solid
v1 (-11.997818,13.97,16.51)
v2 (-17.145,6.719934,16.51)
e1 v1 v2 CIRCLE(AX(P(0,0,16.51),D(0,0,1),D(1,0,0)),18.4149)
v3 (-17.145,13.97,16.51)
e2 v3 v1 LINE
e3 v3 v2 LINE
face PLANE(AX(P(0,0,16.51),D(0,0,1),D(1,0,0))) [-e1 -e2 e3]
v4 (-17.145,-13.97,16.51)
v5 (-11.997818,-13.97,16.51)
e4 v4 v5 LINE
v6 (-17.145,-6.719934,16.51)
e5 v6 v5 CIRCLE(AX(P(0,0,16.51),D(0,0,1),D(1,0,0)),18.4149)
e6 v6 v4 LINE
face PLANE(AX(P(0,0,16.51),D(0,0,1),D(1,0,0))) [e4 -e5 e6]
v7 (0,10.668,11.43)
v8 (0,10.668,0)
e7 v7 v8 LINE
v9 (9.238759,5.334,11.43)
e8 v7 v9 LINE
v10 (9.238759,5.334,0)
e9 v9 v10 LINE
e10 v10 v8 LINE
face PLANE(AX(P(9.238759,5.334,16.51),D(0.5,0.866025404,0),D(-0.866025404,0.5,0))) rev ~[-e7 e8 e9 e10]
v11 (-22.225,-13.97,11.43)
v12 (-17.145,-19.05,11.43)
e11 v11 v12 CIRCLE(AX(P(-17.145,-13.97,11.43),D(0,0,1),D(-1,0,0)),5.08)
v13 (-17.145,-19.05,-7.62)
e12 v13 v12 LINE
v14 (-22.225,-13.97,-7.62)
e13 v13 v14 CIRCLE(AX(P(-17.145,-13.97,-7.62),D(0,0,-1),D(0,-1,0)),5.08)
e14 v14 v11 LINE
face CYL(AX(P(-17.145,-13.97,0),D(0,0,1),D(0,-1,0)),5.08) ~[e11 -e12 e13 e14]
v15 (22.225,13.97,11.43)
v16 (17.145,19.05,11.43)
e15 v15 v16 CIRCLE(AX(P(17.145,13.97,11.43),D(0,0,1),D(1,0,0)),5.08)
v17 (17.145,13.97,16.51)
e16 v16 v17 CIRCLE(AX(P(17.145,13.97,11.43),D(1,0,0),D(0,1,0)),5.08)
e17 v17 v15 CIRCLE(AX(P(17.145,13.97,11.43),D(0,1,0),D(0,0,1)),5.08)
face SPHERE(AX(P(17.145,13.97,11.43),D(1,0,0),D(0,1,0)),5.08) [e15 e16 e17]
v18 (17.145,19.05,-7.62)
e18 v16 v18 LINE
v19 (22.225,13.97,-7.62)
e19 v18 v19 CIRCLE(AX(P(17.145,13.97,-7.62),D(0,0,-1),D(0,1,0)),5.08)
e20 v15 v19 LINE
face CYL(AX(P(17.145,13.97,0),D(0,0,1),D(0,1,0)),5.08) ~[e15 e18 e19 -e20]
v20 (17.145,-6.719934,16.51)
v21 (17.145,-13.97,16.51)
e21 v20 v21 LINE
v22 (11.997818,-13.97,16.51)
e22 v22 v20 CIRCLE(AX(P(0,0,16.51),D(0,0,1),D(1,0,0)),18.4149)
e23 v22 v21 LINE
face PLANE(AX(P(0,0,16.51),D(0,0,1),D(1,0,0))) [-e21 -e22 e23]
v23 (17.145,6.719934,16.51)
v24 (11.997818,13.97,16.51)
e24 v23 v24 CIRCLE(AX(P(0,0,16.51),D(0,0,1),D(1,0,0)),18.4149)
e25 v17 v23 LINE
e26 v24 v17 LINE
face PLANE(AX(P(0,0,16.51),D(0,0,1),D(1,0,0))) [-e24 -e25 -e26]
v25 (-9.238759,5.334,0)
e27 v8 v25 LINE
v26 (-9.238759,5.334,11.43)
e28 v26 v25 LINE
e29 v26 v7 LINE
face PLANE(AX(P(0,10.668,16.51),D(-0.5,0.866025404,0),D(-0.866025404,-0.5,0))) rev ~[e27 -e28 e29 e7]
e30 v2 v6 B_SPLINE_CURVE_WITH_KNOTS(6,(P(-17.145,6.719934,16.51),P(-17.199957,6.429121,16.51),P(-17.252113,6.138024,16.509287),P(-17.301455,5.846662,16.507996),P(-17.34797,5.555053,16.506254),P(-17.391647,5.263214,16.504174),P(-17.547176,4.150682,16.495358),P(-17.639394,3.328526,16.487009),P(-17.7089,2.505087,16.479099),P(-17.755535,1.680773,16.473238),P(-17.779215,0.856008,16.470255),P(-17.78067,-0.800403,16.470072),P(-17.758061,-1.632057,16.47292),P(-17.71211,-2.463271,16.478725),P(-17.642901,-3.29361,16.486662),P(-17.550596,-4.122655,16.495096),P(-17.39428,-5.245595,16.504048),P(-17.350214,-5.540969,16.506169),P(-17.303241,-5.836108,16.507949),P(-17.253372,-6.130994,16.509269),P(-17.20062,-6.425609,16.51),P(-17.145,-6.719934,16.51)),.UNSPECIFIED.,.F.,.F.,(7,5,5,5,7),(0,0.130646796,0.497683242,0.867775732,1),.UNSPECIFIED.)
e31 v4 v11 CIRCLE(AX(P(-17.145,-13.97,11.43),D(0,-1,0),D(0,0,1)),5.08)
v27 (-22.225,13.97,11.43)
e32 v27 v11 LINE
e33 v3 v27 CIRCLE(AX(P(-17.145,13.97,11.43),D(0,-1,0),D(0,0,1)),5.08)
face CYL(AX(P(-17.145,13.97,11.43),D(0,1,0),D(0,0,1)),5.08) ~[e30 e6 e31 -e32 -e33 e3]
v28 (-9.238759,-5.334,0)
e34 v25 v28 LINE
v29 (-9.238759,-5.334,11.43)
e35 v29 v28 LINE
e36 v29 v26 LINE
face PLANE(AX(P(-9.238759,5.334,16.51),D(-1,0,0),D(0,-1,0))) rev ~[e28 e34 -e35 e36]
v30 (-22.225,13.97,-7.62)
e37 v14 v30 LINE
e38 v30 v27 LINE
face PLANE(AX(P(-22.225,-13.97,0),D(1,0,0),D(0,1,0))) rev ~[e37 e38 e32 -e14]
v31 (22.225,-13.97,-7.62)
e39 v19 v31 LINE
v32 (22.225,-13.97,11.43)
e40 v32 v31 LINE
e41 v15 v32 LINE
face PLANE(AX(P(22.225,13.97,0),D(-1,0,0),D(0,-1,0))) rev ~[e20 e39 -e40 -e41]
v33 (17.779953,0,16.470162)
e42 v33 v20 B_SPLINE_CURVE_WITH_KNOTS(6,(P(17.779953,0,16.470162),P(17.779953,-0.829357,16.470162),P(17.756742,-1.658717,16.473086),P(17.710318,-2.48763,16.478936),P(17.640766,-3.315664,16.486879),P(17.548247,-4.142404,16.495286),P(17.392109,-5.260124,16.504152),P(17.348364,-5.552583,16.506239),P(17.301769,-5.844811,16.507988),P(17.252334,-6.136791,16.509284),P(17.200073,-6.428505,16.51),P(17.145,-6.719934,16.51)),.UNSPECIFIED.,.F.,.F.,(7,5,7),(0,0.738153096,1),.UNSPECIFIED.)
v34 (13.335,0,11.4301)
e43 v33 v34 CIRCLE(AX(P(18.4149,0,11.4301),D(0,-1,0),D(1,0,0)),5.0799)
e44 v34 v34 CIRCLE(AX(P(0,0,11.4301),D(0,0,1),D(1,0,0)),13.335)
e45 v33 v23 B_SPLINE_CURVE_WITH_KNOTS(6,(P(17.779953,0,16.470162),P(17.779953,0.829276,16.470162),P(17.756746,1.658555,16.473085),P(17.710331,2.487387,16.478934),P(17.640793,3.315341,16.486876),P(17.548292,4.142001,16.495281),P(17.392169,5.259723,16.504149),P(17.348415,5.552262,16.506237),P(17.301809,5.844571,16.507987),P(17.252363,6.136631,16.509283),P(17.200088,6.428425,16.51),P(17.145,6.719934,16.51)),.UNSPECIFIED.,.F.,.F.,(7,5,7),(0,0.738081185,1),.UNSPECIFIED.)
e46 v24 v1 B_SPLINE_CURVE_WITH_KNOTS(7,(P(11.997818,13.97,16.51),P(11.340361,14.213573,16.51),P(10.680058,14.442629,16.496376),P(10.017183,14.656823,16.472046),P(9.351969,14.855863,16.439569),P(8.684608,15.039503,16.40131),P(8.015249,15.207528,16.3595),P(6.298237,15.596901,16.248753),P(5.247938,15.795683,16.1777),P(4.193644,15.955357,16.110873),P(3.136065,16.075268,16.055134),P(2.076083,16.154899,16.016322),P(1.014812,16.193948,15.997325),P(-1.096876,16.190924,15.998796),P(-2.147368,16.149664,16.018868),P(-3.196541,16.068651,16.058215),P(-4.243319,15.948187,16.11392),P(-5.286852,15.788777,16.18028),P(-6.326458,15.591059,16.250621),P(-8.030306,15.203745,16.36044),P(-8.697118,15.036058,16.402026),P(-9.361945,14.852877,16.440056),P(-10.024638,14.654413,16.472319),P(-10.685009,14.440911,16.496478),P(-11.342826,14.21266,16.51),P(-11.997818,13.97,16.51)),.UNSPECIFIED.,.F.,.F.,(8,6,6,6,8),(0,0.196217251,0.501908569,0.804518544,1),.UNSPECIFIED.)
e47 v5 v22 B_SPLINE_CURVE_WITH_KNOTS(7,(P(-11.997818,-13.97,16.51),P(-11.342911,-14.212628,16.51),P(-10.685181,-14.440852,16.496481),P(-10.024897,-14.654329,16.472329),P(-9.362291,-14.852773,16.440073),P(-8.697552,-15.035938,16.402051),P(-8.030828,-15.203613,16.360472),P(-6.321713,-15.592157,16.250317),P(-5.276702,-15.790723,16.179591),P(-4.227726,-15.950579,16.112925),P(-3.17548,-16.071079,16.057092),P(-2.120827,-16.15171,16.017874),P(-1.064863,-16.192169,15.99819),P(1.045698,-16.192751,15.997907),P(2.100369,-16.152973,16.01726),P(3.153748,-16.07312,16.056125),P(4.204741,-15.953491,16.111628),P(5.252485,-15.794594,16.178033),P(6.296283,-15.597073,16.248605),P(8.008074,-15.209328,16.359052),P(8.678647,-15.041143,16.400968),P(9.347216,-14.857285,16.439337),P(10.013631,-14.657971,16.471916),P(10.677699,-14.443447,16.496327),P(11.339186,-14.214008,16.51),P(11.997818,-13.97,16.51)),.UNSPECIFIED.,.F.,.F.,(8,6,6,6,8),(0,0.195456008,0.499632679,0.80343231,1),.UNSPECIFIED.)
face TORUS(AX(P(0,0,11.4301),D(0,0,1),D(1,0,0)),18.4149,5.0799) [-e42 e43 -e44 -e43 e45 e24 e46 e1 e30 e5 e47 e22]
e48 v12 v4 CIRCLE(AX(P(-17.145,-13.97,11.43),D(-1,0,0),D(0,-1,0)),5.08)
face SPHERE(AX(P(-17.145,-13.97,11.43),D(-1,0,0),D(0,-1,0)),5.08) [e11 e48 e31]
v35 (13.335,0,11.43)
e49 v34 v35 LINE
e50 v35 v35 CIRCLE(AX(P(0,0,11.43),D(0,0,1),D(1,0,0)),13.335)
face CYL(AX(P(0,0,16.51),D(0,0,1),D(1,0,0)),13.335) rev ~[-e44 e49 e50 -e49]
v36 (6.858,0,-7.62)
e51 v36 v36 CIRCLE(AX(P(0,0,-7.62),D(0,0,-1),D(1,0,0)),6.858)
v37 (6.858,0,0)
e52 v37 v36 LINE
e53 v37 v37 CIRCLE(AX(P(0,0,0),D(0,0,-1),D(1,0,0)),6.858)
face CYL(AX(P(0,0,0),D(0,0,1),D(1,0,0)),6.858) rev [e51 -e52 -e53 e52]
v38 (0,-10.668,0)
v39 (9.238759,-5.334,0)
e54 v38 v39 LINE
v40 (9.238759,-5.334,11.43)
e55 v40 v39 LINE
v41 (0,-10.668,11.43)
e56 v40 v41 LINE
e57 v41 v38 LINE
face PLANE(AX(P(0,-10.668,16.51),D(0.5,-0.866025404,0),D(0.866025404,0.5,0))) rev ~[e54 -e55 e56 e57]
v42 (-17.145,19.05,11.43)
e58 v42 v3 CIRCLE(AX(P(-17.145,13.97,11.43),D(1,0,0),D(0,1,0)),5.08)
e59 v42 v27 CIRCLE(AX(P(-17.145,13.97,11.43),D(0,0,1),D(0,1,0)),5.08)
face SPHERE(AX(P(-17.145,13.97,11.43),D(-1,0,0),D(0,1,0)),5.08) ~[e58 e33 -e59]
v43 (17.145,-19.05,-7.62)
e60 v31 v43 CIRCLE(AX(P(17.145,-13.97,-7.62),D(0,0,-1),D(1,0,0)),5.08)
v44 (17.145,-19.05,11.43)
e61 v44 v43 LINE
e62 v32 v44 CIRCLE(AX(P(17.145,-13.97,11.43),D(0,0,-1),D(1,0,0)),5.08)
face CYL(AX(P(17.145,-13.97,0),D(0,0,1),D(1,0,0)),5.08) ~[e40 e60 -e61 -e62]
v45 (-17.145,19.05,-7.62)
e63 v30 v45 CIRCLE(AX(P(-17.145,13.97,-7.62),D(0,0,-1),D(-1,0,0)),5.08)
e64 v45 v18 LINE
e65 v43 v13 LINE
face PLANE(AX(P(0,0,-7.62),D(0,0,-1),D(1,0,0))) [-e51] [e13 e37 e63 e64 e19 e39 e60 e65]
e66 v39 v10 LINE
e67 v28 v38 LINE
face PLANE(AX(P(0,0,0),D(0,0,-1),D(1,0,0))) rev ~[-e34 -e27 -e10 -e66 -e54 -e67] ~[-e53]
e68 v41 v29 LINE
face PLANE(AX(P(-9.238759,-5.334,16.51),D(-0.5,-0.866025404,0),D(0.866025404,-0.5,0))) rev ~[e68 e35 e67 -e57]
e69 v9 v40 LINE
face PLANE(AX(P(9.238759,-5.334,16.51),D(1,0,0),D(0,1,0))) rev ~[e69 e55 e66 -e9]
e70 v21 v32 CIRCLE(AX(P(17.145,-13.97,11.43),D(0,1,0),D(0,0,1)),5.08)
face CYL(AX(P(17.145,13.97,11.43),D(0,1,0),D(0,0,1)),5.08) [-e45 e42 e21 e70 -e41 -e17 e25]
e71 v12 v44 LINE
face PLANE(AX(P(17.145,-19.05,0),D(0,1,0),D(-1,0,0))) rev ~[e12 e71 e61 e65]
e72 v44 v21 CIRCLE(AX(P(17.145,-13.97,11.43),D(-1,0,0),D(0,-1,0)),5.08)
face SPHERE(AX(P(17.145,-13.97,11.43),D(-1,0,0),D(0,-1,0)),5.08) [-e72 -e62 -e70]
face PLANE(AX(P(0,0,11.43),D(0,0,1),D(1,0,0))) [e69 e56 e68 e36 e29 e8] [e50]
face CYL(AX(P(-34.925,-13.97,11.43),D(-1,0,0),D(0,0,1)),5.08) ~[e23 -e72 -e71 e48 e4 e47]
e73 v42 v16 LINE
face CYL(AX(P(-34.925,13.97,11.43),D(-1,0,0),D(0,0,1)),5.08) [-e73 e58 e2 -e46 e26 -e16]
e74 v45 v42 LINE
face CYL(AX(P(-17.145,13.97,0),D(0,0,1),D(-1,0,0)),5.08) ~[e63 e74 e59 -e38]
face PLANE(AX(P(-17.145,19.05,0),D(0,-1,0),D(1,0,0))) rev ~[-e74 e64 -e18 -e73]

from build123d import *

# Parameters (mm, degrees)
F0_W         = 44.45
F0_H         = 38.1
F1_DEPTH     = 16.51
F3_DEPTH     = 25.4
F4_R         = 13.335
F5_DEPTH     = 5.08
F6_F1_R      = 5.0799
F6_T2_DEPTH  = 69.85
F6_T4_DEPTH  = 69.85
F6_T6_DEPTH  = 27.94
F6_T8_DEPTH  = 24.13
F6_T11_ANGLE = 90
F6_T13_ANGLE = 90
F6_T14_DEPTH = 27.94
F6_T16_DEPTH = 24.13
F6_T19_ANGLE = 90
F6_T21_ANGLE = 90
F8_R         = 6.858
F9_DEPTH     = 7.62


# Not quite as in the source:
# - a fillet or chamfer that OpenCascade refuses, or shapes differently, is made with other operations: its cross-section is extruded or revolved along the edge and cut away or added
# - a fillet or chamfer is up to 0.001 mm smaller than in the source, because OpenCascade refuses the exact size
# - a feature of the source that left no trace in its solid (it failed there, or was rolled back) is left out


with BuildPart() as f1:
    # F0 (on Top) → F1 (new body)
    with BuildSketch(Plane.XY):
        Rectangle(F0_W, F0_H)
    extrude(amount=F1_DEPTH)

    # F2 (on face) → F3 (cut)
    with BuildSketch(Plane.XY.offset(16.51)):
        Polygon((9.2387590076, 5.334), (0, 10.668), (-9.2387590076, 5.334), (-9.2387590076, -5.334), (0, -10.668), (9.2387590076, -5.334), align=None)
    extrude(amount=-F3_DEPTH, mode=Mode.SUBTRACT)

    # F4 (on face) → F5 (cut)
    with BuildSketch(Plane.XY.offset(16.51)):
        Circle(F4_R)
        Polygon((-9.2387590076, 5.334), (0, 10.668), (9.2387590076, 5.334), (9.2387590076, -5.334), (0, -10.668), (-9.2387590076, -5.334), align=None, mode=Mode.SUBTRACT)
    extrude(amount=-F5_DEPTH, mode=Mode.SUBTRACT)

    # F6: fillet of radius 5.08 on 5 edges, made by hand

    # F6_f1 (radius 5.08 in the source; OpenCascade refuses exactly that, so slightly less here)
    f6_f1_edges = [f1.edges().sort_by_distance(p)[0] for p in [
        (-13.335, 0, 16.51),
    ]]
    fillet(f6_f1_edges, radius=F6_F1_R)

    # F6_s3 → F6_t2 (cut)
    with BuildSketch(Plane.YZ.offset(-34.925)):
        with BuildLine():
            ThreePointArc((13.97, 16.51), (17.5621024484, 15.0221024484), (19.05, 11.43))
            Line((19.05, 11.43), (19.1516, 11.43))
            Line((19.1516, 11.43), (19.1516, 16.6116))
            Line((19.1516, 16.6116), (13.97, 16.6116))
            Line((13.97, 16.6116), (13.97, 16.51))
        make_face()
    extrude(amount=F6_T2_DEPTH, mode=Mode.SUBTRACT)

    # F6_s5 → F6_t4 (cut)
    with BuildSketch(Plane.YZ.offset(-34.925)):
        with BuildLine():
            ThreePointArc((-13.97, 16.51), (-17.5621024484, 15.0221024484), (-19.05, 11.43))
            Line((-19.05, 11.43), (-19.1516, 11.43))
            Line((-19.1516, 11.43), (-19.1516, 16.6116))
            Line((-19.1516, 16.6116), (-13.97, 16.6116))
            Line((-13.97, 16.6116), (-13.97, 16.51))
        make_face()
    extrude(amount=F6_T4_DEPTH, mode=Mode.SUBTRACT)

    # F6_s7 → F6_t6 (cut)
    with BuildSketch(Plane.XZ.offset(-13.97)):
        with BuildLine():
            ThreePointArc((17.145, 16.51), (20.7371024484, 15.0221024484), (22.225, 11.43))
            Line((22.225, 11.43), (22.3266, 11.43))
            Line((22.3266, 11.43), (22.3266, 16.6116))
            Line((22.3266, 16.6116), (17.145, 16.6116))
            Line((17.145, 16.6116), (17.145, 16.51))
        make_face()
    extrude(amount=F6_T6_DEPTH, mode=Mode.SUBTRACT)

    # F6_s9 → F6_t8 (cut)
    with BuildSketch(Plane.XY.offset(-12.7)):
        with BuildLine():
            ThreePointArc((22.225, 13.97), (20.7371024484, 17.5621024484), (17.145, 19.05))
            Line((17.145, 19.05), (17.145, 19.1516))
            Line((17.145, 19.1516), (22.3266, 19.1516))
            Line((22.3266, 19.1516), (22.3266, 13.97))
            Line((22.3266, 13.97), (22.225, 13.97))
        make_face()
        with BuildLine():
            ThreePointArc((22.225, -13.97), (20.7371024484, -17.5621024484), (17.145, -19.05))
            Line((17.145, -19.05), (17.145, -19.1516))
            Line((17.145, -19.1516), (22.3266, -19.1516))
            Line((22.3266, -19.1516), (22.3266, -13.97))
            Line((22.3266, -13.97), (22.225, -13.97))
        make_face()
    extrude(amount=F6_T8_DEPTH, mode=Mode.SUBTRACT)

    # F6_s10 → F6_t11 (revolve, cut)
    with BuildSketch(Plane.XY.offset(11.43)):
        with BuildLine():
            ThreePointArc((22.225, -13.97), (20.7371024484, -17.5621024484), (17.145, -19.05))
            Line((17.145, -19.05), (17.145, -19.1516))
            Line((17.145, -19.1516), (22.3266, -19.1516))
            Line((22.3266, -19.1516), (22.3266, -13.97))
            Line((22.3266, -13.97), (22.225, -13.97))
        make_face()
    revolve(axis=Axis((22.225, -13.97, 11.43), (-1, 0, 0)), revolution_arc=F6_T11_ANGLE, mode=Mode.SUBTRACT)

    # F6_s12 → F6_t13 (revolve, cut)
    with BuildSketch(Plane.XY.offset(11.43)):
        with BuildLine():
            ThreePointArc((17.145, 19.05), (20.7371024484, 17.5621024484), (22.225, 13.97))
            Line((22.225, 13.97), (22.3266, 13.97))
            Line((22.3266, 13.97), (22.3266, 19.1516))
            Line((22.3266, 19.1516), (17.145, 19.1516))
            Line((17.145, 19.1516), (17.145, 19.05))
        make_face()
    revolve(axis=Axis((22.225, 13.97, 11.43), (1, 0, 0)), revolution_arc=F6_T13_ANGLE, mode=Mode.SUBTRACT)

    # F6_s15 → F6_t14 (cut)
    with BuildSketch(Plane.XZ.offset(-13.97)):
        with BuildLine():
            ThreePointArc((-17.145, 16.51), (-20.7371024484, 15.0221024484), (-22.225, 11.43))
            Line((-22.225, 11.43), (-22.3266, 11.43))
            Line((-22.3266, 11.43), (-22.3266, 16.6116))
            Line((-22.3266, 16.6116), (-17.145, 16.6116))
            Line((-17.145, 16.6116), (-17.145, 16.51))
        make_face()
    extrude(amount=F6_T14_DEPTH, mode=Mode.SUBTRACT)

    # F6_s17 → F6_t16 (cut)
    with BuildSketch(Plane.XY.offset(-12.7)):
        with BuildLine():
            ThreePointArc((-22.225, -13.97), (-20.7371024484, -17.5621024484), (-17.145, -19.05))
            Line((-17.145, -19.05), (-17.145, -19.1516))
            Line((-17.145, -19.1516), (-22.3266, -19.1516))
            Line((-22.3266, -19.1516), (-22.3266, -13.97))
            Line((-22.3266, -13.97), (-22.225, -13.97))
        make_face()
        with BuildLine():
            ThreePointArc((-17.145, 19.05), (-20.7371024484, 17.5621024484), (-22.225, 13.97))
            Line((-22.225, 13.97), (-22.3266, 13.97))
            Line((-22.3266, 13.97), (-22.3266, 19.1516))
            Line((-22.3266, 19.1516), (-17.145, 19.1516))
            Line((-17.145, 19.1516), (-17.145, 19.05))
        make_face()
    extrude(amount=F6_T16_DEPTH, mode=Mode.SUBTRACT)

    # F6_s18 → F6_t19 (revolve, cut)
    with BuildSketch(Plane.XY.offset(11.43)):
        with BuildLine():
            ThreePointArc((-17.145, 19.05), (-20.7371024484, 17.5621024484), (-22.225, 13.97))
            Line((-22.225, 13.97), (-22.3266, 13.97))
            Line((-22.3266, 13.97), (-22.3266, 19.1516))
            Line((-22.3266, 19.1516), (-17.145, 19.1516))
            Line((-17.145, 19.1516), (-17.145, 19.05))
        make_face()
    revolve(axis=Axis((-22.225, 13.97, 11.43), (1, 0, 0)), revolution_arc=F6_T19_ANGLE, mode=Mode.SUBTRACT)

    # F6_s20 → F6_t21 (revolve, cut)
    with BuildSketch(Plane.XY.offset(11.43)):
        with BuildLine():
            ThreePointArc((-17.145, -19.05), (-20.7371024484, -17.5621024484), (-22.225, -13.97))
            Line((-22.225, -13.97), (-22.3266, -13.97))
            Line((-22.3266, -13.97), (-22.3266, -19.1516))
            Line((-22.3266, -19.1516), (-17.145, -19.1516))
            Line((-17.145, -19.1516), (-17.145, -19.05))
        make_face()
    revolve(axis=Axis((-22.225, -13.97, 11.43), (-1, 0, 0)), revolution_arc=F6_T21_ANGLE, mode=Mode.SUBTRACT)

    # F8 (on face) → F9 (join)
    with BuildSketch(Plane(origin=(0, 0, 0), x_dir=(1, 0, 0), z_dir=(0, 0, -1))):
        with BuildLine():
            Line((-17.145, -19.05), (17.145, -19.05))
            ThreePointArc((17.145, -19.05), (20.7371024484, -17.5621024484), (22.225, -13.97))
            Line((22.225, -13.97), (22.225, 13.97))
            ThreePointArc((22.225, 13.97), (20.7371024484, 17.5621024484), (17.145, 19.05))
            Line((17.145, 19.05), (-17.145, 19.05))
            ThreePointArc((-17.145, 19.05), (-20.7371024484, 17.5621024484), (-22.225, 13.97))
            Line((-22.225, 13.97), (-22.225, -13.97))
            ThreePointArc((-22.225, -13.97), (-20.7371024484, -17.5621024484), (-17.145, -19.05))
        make_face()
        Polygon((9.2387590076, 5.334), (9.2387590076, -5.334), (0, -10.668), (-9.2387590076, -5.334), (-9.2387590076, 5.334), (0, 10.668), align=None, mode=Mode.SUBTRACT)
        Polygon((0, -10.668), (9.2387590076, -5.334), (9.2387590076, 5.334), (0, 10.668), (-9.2387590076, 5.334), (-9.2387590076, -5.334), align=None)
        Circle(F8_R, mode=Mode.SUBTRACT)
    extrude(amount=F9_DEPTH)


solid = f1.part
